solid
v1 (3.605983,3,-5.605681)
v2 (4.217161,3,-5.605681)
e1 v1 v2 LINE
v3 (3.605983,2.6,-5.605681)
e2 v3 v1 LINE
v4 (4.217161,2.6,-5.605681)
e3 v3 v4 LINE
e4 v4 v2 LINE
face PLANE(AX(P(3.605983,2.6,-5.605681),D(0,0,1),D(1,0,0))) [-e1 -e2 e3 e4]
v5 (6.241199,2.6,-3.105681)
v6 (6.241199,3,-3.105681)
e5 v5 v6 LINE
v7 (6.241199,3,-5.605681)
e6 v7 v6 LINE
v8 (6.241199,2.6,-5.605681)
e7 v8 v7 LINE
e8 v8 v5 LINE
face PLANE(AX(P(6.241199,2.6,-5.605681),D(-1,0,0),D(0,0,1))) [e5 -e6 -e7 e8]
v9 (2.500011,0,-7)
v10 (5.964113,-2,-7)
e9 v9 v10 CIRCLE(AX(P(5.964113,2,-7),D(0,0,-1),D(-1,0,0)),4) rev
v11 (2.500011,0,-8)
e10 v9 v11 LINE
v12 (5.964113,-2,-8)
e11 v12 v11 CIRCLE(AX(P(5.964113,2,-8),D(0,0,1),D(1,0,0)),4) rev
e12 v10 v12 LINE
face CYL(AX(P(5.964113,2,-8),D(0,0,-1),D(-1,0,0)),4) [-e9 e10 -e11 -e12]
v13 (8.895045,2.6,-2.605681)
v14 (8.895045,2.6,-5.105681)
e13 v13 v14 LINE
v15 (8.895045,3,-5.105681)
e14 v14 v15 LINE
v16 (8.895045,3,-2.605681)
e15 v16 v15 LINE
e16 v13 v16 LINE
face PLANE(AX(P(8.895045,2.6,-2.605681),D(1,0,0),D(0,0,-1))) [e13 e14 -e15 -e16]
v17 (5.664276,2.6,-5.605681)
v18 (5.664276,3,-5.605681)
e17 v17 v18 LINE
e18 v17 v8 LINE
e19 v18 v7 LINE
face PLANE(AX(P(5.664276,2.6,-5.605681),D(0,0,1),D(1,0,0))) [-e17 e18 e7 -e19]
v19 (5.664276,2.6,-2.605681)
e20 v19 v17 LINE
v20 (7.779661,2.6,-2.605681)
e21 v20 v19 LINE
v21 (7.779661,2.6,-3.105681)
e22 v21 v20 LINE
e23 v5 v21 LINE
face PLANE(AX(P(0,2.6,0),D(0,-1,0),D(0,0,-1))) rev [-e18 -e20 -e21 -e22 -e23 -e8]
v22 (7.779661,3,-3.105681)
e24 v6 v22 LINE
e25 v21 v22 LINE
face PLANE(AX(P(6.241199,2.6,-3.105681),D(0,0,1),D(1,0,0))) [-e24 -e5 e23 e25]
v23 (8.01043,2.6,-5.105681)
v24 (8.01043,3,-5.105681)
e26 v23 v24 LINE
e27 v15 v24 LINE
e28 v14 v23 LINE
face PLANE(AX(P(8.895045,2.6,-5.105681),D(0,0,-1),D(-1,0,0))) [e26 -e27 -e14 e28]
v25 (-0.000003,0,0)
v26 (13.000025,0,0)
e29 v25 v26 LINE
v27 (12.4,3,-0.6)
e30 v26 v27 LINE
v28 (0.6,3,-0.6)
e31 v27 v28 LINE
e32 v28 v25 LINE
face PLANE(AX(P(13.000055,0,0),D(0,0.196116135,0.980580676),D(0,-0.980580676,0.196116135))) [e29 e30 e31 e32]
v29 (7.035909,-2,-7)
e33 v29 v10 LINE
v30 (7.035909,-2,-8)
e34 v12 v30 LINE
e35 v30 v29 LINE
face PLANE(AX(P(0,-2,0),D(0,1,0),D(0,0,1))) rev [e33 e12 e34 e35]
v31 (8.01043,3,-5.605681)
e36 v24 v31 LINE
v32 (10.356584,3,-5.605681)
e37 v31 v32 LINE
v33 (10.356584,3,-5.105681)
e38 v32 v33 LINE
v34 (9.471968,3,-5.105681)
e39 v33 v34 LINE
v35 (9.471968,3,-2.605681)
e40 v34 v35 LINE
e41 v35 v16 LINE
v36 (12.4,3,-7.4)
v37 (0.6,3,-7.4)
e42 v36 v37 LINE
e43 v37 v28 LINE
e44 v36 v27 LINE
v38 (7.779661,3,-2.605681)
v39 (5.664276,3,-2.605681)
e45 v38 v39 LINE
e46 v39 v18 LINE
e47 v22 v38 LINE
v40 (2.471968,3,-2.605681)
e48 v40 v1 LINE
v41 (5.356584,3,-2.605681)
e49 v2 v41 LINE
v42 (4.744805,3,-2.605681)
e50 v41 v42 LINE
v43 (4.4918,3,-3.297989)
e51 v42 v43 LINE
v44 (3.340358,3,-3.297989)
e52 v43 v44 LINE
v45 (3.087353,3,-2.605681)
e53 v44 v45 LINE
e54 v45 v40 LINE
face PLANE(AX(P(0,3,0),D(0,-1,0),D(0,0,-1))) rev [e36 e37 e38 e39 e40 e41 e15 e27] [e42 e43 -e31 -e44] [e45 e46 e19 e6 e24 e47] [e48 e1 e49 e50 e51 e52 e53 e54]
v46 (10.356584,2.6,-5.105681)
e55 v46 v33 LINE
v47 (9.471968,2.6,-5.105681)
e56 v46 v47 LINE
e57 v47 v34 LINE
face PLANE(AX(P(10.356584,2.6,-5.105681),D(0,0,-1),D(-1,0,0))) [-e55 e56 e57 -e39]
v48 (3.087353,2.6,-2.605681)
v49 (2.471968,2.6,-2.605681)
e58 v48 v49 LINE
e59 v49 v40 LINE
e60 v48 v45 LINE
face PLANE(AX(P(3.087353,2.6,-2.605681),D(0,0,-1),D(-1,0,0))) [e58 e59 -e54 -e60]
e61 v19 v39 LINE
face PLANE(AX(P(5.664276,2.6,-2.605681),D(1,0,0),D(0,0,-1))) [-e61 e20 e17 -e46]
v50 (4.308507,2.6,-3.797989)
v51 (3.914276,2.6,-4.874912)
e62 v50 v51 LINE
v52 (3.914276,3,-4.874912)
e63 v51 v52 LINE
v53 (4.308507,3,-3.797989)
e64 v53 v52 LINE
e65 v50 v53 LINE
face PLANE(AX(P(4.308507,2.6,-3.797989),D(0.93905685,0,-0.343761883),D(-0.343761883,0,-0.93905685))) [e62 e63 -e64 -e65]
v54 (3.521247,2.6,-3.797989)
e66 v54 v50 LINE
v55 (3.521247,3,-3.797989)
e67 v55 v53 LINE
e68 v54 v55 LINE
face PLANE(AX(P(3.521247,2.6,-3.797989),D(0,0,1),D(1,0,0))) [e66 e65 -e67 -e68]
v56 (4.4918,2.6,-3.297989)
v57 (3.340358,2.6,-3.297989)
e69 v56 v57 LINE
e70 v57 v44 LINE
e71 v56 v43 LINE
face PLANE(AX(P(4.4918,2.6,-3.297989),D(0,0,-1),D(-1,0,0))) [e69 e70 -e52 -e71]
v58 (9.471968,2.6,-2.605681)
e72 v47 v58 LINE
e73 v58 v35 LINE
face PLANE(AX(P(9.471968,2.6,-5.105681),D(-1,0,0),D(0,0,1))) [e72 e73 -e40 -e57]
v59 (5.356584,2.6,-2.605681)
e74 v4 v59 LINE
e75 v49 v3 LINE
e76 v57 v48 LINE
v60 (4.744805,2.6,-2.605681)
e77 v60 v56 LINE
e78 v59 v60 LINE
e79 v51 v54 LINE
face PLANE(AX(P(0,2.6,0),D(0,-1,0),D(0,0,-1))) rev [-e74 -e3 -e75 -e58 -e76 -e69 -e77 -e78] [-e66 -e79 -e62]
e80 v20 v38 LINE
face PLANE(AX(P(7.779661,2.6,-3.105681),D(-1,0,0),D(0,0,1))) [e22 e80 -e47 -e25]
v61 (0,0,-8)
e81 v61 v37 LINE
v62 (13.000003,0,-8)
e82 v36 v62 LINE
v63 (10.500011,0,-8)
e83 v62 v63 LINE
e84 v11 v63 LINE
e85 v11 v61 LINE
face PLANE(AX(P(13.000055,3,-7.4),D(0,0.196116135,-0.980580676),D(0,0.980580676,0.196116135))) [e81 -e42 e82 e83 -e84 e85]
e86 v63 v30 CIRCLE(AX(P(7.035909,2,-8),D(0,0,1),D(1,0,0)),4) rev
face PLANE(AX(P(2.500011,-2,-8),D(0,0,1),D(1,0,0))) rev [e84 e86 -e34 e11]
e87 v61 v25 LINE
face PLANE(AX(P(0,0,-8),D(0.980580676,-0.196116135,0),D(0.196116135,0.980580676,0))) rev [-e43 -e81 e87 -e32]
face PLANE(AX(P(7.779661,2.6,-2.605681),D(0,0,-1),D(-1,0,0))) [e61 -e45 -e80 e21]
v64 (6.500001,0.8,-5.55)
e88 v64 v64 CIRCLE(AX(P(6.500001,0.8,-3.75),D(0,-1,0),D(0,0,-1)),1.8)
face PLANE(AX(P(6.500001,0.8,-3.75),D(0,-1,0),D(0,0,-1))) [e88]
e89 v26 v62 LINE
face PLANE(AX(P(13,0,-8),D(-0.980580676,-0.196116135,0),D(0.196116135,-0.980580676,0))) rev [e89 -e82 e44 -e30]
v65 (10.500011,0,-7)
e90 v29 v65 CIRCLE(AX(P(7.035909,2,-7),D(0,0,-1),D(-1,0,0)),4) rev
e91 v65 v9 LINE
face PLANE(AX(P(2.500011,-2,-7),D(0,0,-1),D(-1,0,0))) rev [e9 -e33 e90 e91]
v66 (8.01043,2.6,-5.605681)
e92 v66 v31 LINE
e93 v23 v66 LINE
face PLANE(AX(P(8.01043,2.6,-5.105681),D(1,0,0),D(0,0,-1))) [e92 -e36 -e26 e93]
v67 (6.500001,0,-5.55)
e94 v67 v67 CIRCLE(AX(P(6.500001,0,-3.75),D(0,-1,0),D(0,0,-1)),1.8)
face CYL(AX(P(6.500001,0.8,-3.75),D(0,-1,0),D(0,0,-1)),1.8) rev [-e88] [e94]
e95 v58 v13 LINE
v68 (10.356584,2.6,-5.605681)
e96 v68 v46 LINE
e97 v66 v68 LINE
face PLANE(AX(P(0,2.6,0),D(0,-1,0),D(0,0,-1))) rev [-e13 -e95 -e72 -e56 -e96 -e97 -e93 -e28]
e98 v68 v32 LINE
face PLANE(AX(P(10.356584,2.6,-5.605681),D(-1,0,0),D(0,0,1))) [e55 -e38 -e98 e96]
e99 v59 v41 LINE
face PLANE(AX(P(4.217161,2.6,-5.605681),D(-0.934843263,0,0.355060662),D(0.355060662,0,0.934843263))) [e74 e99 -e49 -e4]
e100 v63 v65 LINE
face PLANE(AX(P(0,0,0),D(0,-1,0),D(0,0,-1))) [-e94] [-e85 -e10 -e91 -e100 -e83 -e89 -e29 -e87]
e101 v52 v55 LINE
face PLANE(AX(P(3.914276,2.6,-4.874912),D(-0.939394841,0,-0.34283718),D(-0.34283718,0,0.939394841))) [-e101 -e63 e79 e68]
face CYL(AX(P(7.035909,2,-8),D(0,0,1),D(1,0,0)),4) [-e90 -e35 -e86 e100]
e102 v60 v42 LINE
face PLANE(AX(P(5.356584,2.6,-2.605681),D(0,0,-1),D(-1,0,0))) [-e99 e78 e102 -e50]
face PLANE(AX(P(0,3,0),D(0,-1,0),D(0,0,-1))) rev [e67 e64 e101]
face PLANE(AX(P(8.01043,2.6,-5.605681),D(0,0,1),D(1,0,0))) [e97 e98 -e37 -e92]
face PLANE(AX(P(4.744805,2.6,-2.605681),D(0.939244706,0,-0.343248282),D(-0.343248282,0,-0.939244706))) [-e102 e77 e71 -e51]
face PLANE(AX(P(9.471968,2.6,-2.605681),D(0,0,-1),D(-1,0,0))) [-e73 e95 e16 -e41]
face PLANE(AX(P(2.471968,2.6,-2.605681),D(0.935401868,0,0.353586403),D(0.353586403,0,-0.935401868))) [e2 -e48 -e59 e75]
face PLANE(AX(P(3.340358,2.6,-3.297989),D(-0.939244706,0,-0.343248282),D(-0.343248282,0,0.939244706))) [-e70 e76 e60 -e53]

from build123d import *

# Parameters (mm, degrees)
SKETCH1_W               = 13
SKETCH1_H               = 8
BOSS_EXTRUDE1_DEPTH     = 3
CUT_EXTRUDE1_DEPTH      = 16.556349186
CUT_EXTRUDE1_DEPTH_BACK = 16.556349186
CUT_EXTRUDE2_DEPTH      = 16.556349186
CUT_EXTRUDE2_DEPTH_BACK = 16.556349186
SKETCH4_R               = 1.8
CUT_EXTRUDE3_DEPTH      = 0.8
SKETCH5_W               = 8
SKETCH5_H               = 1
BOSS_EXTRUDE2_DEPTH     = 2
FILLET1_R               = 4
CUT_EXTRUDE4_DEPTH      = 0.4


with BuildPart() as part:
    # Sketch1 → Boss-Extrude1 (new body)
    with BuildSketch(Plane(origin=(0, 0, 0), x_dir=(1, 0, 0), z_dir=(0, 1, 0))):
        with Locations((6.5, 4)):
            Rectangle(SKETCH1_W, SKETCH1_H)
    extrude(amount=BOSS_EXTRUDE1_DEPTH)

    # Sketch2 → Cut-Extrude1 (cut, two sides: drawn at the far end of the back side and taken through both)
    with BuildSketch(Plane.XY.offset(-CUT_EXTRUDE1_DEPTH_BACK)):
        Polygon((0, 0), (0.6, 3), (0, 3), align=None)
        Polygon((13, 0), (12.4, 3), (13, 3), align=None)
    extrude(amount=CUT_EXTRUDE1_DEPTH + CUT_EXTRUDE1_DEPTH_BACK, mode=Mode.SUBTRACT)

    # Sketch3 → Cut-Extrude2 (cut, two sides: drawn at the far end of the back side and taken through both)
    with BuildSketch(Plane(origin=(0, 0, 0), x_dir=(0, 0, -1), z_dir=(1, 0, 0)).offset(-CUT_EXTRUDE2_DEPTH_BACK)):
        Polygon((0, 0), (0.6, 3), (0, 3), align=None)
        Polygon((8, 3), (7.4, 3), (8, 0), align=None)
    extrude(amount=CUT_EXTRUDE2_DEPTH + CUT_EXTRUDE2_DEPTH_BACK, mode=Mode.SUBTRACT)

    # Sketch4 → Cut-Extrude3 (cut)
    with BuildSketch(Plane.XZ):
        with Locations(Location((6.50000125, -3.75, 0), (0, 0, 270))):
            Circle(SKETCH4_R)
    extrude(amount=-CUT_EXTRUDE3_DEPTH, mode=Mode.SUBTRACT)

    # Sketch5 → Boss-Extrude2 (add)
    with BuildSketch(Plane.XZ):
        with Locations((6.500011, -7.5)):
            Rectangle(SKETCH5_W, SKETCH5_H)
    extrude(amount=BOSS_EXTRUDE2_DEPTH)

    # Fillet1
    # the kernel refuses this fillet: 4 mm, written as the material it takes off along each edge
    with BuildSketch(Plane(origin=(10.500011, -2, -16.660254038), x_dir=(0, 1, 0), z_dir=(0, 0, 1)), Plane(origin=(2.500011, -2, 1.660254038), x_dir=(0, 1, 0), z_dir=(0, 0, -1))) as fillet1_piece_1:
        with BuildLine():
            CenterArc((4, 3.464101615), FILLET1_R, 180, 60)
            Line((0, 3.464101615), (-0.08, 3.464101615))
            Line((-0.08, 3.464101615), (-0.08, 0))
            Line((-0.08, 0), (0, -0.08))
            ThreePointArc((0, -0.08), (1, -0.08), (1.96, -0.069282032))
            Line((1.96, -0.069282032), (2, 0))
        make_face()
    extrude(amount=18.320508076, mode=Mode.SUBTRACT)

    # Sketch6 → Cut-Extrude4 (cut)
    # profile 1 of 3: a face of its own
    with BuildSketch(Plane(origin=(0, 3, 0), x_dir=(1, 0, 0), z_dir=(0, 1, 0))):
        Polygon((5.356583629, 2.605681315), (4.744804782, 2.605681315), (4.491799975, 3.297989008), (3.340357667, 3.297989008), (3.087352859, 2.605681315), (2.471968244, 2.605681315), (3.605982667, 5.605681315), (4.217160552, 5.605681315), align=None)
        Polygon((4.308506705, 3.797989008), (3.914275936, 4.874912084), (3.52124709, 3.797989008), align=None, mode=Mode.SUBTRACT)
    # profile 2 of 3: a face of its own
    with BuildSketch(Plane(origin=(0, 3, 0), x_dir=(1, 0, 0), z_dir=(0, 1, 0))):
        Polygon((5.664275936, 2.605681315), (5.664275936, 5.605681315), (6.241199013, 5.605681315), (6.241199013, 3.105681315), (7.779660552, 3.105681315), (7.779660552, 2.605681315), align=None)
    # profile 3 of 3: a face of its own
    with BuildSketch(Plane(origin=(0, 3, 0), x_dir=(1, 0, 0), z_dir=(0, 1, 0))):
        Polygon((8.895045167, 2.605681315), (8.895045167, 5.105681315), (8.010429782, 5.105681315), (8.010429782, 5.605681315), (10.356583629, 5.605681315), (10.356583629, 5.105681315), (9.471968244, 5.105681315), (9.471968244, 2.605681315), align=None)
    extrude(amount=-CUT_EXTRUDE4_DEPTH, mode=Mode.SUBTRACT)


solid = part.part
